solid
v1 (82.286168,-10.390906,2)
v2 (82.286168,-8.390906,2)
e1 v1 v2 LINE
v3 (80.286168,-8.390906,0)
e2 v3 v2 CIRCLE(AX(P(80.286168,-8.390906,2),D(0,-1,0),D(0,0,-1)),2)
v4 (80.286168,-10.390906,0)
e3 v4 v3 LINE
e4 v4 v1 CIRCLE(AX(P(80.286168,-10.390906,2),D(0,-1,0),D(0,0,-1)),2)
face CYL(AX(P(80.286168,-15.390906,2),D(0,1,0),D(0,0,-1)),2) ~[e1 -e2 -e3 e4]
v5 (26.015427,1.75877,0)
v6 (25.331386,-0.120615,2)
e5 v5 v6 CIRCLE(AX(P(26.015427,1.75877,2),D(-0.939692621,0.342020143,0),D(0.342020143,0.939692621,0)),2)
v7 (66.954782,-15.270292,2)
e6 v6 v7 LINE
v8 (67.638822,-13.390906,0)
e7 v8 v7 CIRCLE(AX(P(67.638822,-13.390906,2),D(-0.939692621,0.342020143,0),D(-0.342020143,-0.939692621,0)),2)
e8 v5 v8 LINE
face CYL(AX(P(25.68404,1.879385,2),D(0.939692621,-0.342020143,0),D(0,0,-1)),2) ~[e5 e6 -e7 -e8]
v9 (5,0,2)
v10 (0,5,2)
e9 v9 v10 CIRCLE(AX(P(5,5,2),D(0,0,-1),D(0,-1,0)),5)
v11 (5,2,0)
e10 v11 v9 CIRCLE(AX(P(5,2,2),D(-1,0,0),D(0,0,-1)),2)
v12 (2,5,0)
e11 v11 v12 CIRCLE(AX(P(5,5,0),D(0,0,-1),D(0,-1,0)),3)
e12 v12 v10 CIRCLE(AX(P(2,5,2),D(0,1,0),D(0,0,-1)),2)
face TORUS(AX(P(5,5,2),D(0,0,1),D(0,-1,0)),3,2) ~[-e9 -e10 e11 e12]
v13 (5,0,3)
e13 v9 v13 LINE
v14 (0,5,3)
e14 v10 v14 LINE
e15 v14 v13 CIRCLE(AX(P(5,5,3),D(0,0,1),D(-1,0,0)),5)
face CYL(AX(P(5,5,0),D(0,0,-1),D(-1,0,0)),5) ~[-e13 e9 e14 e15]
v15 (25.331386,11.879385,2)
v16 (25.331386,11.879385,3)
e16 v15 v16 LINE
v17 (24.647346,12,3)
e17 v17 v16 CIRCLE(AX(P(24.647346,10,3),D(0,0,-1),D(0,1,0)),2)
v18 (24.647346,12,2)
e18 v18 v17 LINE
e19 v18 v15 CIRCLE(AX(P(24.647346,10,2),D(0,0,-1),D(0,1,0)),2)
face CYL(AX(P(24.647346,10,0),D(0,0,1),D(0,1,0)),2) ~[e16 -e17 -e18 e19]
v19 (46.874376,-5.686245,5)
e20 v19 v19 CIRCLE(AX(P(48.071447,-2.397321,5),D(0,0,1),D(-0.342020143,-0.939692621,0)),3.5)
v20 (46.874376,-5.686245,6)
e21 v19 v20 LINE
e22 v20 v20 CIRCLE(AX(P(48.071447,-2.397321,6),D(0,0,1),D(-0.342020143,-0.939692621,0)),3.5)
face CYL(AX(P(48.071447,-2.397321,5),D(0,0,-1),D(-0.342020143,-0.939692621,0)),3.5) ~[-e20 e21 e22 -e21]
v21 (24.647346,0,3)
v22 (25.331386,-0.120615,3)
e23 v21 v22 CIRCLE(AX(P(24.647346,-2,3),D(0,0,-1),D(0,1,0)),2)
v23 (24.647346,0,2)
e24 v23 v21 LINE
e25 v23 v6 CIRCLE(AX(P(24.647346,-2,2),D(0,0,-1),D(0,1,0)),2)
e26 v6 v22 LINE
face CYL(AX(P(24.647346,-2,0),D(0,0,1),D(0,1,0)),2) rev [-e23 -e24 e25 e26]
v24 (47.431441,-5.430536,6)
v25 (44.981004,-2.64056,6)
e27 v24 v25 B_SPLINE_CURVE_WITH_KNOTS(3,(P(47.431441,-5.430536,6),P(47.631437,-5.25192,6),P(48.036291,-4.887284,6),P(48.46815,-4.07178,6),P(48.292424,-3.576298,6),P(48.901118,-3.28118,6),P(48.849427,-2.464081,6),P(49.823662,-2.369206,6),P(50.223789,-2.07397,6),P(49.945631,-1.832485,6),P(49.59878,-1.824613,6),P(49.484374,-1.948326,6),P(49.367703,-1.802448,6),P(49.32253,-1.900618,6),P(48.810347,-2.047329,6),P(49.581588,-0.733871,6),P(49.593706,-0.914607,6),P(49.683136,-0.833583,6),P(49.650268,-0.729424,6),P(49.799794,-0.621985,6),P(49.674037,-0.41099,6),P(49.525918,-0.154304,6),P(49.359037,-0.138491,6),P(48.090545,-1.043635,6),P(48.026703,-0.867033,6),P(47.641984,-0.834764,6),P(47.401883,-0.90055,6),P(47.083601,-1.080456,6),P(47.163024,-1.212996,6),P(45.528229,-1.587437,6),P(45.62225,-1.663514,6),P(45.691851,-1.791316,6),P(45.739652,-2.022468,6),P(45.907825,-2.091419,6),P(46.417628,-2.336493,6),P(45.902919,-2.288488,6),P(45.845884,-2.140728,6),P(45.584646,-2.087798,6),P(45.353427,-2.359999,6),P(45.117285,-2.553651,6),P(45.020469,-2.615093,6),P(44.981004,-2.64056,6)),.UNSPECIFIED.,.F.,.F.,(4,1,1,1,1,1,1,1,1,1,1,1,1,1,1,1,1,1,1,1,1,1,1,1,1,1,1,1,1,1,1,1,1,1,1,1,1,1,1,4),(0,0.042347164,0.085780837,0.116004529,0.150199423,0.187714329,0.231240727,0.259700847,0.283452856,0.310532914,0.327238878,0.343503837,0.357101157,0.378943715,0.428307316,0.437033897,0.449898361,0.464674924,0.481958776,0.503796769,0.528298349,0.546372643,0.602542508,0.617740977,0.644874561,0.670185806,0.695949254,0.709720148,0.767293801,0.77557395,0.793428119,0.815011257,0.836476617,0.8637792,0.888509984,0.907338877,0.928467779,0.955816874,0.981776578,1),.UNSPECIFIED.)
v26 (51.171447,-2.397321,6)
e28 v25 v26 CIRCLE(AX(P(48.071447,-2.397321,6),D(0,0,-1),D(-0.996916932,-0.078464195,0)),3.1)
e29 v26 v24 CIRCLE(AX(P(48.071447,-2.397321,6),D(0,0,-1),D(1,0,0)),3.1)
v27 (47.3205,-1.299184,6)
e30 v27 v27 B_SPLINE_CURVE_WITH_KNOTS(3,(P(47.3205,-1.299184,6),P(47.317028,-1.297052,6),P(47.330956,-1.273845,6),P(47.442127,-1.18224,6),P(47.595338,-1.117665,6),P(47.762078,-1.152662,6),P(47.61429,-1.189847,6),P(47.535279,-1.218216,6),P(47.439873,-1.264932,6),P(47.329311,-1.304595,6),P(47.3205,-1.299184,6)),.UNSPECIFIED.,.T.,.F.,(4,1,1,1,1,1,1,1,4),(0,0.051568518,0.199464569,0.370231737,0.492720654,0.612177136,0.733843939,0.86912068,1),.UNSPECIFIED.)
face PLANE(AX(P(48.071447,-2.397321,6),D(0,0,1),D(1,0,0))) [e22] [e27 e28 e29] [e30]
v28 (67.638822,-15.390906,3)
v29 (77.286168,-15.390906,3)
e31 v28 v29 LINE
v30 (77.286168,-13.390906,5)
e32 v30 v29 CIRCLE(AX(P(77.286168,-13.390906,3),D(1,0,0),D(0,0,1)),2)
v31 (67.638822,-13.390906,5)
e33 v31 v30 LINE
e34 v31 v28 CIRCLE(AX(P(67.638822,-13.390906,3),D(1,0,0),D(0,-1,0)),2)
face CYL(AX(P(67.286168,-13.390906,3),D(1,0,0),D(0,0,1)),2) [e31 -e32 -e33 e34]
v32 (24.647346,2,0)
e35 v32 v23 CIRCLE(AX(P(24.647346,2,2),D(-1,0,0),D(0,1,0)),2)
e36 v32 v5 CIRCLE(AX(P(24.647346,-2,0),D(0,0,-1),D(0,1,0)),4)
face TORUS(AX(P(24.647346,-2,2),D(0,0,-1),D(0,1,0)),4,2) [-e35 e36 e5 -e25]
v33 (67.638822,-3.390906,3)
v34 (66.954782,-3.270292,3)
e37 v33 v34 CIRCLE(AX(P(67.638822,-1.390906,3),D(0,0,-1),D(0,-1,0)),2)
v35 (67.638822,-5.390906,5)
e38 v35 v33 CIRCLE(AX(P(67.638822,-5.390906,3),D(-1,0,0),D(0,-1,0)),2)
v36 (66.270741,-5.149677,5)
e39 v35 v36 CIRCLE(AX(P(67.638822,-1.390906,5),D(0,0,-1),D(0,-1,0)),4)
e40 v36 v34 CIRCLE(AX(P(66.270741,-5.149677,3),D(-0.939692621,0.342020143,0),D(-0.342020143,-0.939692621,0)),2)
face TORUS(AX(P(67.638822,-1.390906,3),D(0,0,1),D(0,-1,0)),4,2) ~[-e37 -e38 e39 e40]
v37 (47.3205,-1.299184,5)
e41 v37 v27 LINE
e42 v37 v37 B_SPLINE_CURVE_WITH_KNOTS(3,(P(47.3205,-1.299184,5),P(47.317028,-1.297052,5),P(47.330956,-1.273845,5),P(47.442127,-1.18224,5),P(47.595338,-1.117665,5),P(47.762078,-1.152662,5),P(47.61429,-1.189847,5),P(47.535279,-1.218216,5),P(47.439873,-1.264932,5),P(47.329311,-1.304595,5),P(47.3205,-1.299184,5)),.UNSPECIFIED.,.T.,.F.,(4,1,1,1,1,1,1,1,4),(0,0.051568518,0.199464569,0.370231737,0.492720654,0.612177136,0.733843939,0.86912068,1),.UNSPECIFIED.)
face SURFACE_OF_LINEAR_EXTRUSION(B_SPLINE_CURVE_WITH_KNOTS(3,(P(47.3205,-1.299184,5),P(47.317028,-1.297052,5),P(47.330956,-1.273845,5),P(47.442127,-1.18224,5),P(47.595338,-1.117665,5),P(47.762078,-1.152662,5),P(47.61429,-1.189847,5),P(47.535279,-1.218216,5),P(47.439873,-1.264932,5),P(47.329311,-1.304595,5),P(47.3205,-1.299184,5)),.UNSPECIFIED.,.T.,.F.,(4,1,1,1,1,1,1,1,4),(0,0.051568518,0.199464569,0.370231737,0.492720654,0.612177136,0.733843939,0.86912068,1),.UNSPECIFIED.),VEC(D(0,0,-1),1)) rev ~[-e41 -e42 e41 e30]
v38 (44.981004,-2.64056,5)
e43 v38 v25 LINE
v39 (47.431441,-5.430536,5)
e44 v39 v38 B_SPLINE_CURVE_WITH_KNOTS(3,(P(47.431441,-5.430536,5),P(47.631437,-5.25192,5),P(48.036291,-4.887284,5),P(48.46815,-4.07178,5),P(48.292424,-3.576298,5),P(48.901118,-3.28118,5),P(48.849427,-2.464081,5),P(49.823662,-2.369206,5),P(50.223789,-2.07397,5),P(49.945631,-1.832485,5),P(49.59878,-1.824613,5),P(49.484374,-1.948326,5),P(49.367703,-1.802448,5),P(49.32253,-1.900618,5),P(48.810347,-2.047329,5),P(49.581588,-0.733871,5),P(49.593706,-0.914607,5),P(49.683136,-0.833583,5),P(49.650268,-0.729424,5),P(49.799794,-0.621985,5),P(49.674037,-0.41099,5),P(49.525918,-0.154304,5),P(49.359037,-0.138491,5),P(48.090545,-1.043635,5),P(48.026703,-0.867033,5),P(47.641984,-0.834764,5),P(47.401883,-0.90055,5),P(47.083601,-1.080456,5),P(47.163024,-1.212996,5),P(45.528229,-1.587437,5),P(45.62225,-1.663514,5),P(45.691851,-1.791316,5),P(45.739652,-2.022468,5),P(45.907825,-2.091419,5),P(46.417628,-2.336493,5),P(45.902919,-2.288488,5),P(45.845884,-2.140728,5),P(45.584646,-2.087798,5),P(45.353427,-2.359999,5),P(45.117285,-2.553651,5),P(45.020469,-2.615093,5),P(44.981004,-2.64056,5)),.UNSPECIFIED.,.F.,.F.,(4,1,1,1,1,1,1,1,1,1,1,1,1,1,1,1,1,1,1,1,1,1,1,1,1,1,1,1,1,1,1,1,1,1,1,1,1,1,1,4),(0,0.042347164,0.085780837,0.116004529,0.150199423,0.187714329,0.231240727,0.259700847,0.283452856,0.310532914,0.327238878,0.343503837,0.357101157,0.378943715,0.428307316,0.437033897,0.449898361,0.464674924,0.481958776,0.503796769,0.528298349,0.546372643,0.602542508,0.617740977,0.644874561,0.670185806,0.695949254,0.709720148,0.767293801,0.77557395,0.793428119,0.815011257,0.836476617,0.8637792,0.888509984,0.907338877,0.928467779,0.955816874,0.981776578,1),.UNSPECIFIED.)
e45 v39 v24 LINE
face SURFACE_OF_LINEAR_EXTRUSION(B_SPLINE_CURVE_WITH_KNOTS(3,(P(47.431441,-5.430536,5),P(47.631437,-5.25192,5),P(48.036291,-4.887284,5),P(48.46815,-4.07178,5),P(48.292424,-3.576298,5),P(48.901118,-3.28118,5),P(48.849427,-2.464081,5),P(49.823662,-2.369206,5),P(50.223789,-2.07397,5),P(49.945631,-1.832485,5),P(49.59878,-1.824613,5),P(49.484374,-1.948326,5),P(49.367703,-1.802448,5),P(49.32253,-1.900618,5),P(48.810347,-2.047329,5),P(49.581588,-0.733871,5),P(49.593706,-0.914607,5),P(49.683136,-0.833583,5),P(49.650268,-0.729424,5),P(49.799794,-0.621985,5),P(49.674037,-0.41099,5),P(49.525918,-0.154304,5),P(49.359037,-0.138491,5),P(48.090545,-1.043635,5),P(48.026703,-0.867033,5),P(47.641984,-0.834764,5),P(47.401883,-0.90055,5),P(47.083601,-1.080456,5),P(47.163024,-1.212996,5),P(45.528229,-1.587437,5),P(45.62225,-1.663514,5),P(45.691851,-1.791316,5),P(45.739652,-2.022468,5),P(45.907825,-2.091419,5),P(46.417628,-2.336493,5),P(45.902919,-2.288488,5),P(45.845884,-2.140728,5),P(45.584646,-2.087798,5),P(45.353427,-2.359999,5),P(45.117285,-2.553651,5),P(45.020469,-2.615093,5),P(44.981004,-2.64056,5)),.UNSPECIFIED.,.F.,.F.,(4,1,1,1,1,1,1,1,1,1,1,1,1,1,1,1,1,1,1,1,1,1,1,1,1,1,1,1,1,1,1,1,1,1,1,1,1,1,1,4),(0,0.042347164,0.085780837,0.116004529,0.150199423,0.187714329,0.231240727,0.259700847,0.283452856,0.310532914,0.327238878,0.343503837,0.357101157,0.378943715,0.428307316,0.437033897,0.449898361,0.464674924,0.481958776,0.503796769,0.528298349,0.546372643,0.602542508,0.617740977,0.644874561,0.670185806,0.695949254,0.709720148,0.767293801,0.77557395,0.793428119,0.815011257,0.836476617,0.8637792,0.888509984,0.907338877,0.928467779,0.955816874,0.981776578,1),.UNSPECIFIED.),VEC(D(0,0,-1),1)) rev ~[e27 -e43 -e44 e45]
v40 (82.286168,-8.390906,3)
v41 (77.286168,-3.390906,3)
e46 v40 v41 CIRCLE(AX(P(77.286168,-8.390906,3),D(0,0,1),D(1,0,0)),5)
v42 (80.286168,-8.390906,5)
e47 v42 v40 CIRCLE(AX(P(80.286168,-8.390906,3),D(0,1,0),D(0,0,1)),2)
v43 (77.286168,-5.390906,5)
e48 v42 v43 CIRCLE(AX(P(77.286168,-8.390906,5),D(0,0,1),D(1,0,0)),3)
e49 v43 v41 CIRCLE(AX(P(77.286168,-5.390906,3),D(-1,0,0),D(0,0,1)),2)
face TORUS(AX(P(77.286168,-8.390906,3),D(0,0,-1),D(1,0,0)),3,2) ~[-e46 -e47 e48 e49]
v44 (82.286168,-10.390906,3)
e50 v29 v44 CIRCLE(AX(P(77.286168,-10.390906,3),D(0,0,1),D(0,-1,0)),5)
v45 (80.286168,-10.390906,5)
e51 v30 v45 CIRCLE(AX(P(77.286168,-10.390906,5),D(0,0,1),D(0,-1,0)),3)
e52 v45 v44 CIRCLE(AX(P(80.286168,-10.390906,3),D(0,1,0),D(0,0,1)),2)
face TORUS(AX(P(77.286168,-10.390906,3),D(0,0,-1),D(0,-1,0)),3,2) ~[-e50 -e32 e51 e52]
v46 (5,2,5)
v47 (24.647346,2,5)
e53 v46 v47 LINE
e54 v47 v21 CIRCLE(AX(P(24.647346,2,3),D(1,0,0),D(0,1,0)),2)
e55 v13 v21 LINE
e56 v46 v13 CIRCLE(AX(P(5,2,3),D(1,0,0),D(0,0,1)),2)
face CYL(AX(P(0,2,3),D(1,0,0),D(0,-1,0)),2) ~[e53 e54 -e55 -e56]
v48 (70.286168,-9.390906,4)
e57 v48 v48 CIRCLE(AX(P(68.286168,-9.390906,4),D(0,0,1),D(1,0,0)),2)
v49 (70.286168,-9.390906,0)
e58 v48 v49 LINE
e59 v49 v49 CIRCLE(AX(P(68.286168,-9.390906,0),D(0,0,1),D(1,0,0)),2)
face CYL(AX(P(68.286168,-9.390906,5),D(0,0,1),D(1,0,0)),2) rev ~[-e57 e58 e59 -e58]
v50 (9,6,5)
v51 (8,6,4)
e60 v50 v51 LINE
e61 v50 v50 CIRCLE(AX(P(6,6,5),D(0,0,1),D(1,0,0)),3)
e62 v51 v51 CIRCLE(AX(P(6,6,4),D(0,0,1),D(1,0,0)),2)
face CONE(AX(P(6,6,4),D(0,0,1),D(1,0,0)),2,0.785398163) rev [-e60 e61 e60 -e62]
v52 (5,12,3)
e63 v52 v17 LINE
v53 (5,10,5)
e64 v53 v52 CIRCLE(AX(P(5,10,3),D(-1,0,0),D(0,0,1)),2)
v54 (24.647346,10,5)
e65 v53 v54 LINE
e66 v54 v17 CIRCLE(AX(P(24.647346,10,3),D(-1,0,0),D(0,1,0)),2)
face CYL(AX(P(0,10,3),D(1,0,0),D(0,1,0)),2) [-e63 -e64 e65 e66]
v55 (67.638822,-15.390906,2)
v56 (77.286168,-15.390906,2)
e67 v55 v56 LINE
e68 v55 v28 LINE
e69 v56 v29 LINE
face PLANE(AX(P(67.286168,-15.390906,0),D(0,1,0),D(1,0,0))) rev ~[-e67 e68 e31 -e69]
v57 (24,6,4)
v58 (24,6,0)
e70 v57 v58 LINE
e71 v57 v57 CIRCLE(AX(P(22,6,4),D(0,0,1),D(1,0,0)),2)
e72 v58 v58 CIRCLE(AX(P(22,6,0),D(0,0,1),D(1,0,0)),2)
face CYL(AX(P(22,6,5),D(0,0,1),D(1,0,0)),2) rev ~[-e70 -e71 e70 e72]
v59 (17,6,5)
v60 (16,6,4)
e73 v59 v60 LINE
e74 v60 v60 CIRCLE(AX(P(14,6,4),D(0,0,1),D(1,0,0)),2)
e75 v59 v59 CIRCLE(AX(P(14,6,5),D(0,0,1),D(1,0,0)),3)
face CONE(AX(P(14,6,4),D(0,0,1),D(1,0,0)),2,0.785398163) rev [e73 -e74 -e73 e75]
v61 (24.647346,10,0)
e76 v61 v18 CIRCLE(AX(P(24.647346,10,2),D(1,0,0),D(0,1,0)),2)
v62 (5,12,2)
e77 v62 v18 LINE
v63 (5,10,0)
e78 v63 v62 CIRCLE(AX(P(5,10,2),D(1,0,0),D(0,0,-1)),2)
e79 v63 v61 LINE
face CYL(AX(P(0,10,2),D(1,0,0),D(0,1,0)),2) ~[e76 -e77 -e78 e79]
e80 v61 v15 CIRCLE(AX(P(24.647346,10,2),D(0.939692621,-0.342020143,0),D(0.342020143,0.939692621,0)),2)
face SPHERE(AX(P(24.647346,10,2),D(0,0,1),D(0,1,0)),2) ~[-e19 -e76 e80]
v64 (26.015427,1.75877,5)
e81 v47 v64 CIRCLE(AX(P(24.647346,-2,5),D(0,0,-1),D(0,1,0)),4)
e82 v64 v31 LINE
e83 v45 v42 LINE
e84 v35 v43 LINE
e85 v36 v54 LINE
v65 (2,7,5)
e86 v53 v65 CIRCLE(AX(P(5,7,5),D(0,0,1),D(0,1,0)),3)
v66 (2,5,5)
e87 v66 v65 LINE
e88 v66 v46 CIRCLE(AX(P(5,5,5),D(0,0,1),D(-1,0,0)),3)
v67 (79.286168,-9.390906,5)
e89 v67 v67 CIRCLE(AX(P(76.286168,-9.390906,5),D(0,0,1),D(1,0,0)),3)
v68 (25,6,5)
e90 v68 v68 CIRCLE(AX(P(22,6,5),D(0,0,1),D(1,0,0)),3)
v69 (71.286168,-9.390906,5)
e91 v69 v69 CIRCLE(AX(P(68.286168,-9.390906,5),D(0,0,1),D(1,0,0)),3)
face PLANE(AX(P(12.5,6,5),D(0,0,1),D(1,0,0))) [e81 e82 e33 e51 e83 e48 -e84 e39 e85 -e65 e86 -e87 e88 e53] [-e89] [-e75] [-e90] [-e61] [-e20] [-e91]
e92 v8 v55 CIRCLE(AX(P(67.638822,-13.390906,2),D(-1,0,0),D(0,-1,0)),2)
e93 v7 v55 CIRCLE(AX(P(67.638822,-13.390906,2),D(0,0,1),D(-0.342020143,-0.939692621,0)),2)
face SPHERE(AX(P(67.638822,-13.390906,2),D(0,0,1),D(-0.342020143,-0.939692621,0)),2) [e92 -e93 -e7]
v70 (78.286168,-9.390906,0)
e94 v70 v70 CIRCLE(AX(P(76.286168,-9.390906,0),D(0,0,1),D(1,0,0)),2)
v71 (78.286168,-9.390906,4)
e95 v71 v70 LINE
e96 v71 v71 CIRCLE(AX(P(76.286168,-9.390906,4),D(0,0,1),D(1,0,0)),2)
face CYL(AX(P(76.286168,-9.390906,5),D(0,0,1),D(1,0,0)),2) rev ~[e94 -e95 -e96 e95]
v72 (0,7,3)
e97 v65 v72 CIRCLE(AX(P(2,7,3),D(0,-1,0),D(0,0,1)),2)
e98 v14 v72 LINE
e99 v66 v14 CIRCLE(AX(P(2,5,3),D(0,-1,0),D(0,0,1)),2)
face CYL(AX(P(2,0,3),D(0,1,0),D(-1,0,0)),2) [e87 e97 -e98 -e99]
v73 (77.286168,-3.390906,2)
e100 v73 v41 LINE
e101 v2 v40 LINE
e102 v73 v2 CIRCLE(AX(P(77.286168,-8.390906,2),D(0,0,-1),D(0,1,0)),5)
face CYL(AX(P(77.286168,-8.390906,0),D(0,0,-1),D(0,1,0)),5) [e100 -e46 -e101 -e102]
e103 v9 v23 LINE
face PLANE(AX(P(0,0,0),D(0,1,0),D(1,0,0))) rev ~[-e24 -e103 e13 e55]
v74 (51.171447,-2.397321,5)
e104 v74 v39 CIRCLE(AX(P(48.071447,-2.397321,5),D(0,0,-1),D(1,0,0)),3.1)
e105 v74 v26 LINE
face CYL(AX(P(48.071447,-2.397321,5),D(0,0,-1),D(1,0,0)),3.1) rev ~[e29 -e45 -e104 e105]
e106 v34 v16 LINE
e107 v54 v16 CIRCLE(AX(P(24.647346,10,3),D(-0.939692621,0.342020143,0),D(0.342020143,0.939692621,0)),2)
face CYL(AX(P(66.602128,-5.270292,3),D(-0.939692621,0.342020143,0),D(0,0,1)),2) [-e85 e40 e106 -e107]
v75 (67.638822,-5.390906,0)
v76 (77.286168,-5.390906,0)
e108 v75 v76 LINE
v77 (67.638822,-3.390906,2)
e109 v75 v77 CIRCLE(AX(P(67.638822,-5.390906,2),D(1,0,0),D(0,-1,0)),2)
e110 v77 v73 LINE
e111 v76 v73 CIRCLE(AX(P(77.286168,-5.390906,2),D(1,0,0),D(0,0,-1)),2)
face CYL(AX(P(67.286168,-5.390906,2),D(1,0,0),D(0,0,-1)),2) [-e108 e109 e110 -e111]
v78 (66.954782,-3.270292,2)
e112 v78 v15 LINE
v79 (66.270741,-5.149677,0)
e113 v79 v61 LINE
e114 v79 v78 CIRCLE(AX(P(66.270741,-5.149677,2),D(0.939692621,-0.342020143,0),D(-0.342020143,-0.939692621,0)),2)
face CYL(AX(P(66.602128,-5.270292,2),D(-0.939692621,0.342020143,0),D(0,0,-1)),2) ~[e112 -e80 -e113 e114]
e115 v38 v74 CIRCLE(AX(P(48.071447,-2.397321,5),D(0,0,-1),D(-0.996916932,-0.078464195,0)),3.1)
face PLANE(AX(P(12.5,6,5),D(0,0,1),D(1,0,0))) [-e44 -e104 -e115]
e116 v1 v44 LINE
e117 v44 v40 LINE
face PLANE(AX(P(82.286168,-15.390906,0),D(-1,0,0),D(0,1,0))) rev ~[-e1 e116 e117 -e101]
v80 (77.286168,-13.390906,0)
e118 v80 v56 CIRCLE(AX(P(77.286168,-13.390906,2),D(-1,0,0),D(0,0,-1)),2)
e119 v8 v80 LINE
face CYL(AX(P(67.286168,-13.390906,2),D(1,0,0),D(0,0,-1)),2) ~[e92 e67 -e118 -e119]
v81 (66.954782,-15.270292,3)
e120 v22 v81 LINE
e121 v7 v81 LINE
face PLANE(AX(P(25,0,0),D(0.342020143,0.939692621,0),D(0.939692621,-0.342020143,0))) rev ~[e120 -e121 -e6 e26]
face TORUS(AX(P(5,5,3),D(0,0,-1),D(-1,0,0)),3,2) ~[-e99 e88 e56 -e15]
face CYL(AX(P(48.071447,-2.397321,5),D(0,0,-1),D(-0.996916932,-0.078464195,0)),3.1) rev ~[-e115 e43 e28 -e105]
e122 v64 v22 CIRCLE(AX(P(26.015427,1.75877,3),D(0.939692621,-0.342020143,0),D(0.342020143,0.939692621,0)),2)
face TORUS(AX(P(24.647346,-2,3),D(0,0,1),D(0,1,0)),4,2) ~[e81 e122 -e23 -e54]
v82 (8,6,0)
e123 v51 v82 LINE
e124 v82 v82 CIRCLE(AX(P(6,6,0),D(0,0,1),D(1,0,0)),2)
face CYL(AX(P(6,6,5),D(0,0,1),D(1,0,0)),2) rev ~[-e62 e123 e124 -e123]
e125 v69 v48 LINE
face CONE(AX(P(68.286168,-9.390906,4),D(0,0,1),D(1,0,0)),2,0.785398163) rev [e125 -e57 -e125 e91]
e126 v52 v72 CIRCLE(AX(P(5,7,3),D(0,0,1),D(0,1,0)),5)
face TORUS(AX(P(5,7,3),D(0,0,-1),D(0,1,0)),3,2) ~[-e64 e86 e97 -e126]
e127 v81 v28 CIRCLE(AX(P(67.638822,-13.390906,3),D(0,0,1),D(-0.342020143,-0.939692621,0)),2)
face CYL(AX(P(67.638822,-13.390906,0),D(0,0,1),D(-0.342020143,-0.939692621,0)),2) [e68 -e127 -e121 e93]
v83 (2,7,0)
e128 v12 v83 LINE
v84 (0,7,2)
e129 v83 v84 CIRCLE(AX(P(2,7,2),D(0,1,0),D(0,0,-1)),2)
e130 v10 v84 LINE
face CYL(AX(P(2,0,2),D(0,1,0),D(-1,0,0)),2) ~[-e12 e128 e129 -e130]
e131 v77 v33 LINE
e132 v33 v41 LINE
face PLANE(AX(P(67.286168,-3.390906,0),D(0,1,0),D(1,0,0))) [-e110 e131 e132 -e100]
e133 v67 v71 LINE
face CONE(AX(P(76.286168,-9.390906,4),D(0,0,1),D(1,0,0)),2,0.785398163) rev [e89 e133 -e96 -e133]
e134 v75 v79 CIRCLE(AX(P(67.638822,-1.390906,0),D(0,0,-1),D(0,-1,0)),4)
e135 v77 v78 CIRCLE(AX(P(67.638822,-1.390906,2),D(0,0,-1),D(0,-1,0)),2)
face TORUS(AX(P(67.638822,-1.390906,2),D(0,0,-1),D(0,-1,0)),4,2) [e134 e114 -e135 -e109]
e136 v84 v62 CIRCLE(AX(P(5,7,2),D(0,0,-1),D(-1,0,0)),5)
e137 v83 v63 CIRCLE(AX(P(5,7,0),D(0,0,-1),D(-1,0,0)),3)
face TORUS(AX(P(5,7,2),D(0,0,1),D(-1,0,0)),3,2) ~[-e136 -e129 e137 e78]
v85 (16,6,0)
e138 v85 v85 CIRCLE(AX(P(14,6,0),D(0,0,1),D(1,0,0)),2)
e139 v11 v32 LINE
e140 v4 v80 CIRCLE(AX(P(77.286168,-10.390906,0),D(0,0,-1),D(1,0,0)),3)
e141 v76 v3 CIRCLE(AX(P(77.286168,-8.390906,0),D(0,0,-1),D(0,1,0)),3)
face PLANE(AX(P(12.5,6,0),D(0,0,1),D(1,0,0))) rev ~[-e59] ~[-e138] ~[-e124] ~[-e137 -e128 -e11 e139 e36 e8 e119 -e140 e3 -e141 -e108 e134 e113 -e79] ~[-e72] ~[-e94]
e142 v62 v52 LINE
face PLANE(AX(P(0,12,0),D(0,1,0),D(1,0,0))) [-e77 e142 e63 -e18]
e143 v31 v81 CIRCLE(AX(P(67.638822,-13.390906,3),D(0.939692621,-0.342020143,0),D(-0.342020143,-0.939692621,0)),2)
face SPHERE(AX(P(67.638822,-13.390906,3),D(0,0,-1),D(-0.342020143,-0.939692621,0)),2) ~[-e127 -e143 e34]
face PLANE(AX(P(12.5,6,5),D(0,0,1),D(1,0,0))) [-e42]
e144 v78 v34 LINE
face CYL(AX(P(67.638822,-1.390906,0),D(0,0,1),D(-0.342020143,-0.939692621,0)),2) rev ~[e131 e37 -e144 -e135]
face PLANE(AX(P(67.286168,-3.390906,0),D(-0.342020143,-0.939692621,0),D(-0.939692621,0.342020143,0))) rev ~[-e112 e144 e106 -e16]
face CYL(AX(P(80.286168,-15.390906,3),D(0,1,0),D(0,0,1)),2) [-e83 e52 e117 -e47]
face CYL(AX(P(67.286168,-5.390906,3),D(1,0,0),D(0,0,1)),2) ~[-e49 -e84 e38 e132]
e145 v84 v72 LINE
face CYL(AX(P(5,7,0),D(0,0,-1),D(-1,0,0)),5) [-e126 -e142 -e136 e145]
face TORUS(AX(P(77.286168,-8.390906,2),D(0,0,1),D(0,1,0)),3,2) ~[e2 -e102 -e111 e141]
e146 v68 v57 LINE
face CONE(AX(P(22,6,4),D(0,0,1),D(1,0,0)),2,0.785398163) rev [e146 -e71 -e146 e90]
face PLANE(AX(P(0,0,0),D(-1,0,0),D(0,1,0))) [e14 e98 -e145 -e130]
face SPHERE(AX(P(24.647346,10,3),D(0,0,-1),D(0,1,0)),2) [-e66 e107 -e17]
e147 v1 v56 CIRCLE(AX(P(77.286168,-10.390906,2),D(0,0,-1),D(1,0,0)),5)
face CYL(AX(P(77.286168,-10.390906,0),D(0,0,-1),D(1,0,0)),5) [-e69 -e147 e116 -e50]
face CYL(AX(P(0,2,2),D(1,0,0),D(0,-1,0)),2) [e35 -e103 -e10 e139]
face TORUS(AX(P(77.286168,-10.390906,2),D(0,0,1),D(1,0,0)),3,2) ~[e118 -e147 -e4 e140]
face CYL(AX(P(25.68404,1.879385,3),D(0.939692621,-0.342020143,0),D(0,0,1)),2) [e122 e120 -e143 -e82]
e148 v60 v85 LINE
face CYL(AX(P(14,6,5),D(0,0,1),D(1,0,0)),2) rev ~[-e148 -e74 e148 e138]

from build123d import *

# Parameters (mm, degrees)
F0_W         = 25
F0_H         = 12
F0_W_2       = 15
F1_DEPTH     = 5
F2_R         = 2
F3_DEPTH     = 5.001
F4_R         = 2
F5_T1_DEPTH  = 5
F5_T4_ANGLE  = 90
F5_T6_ANGLE  = 90
F5_T8_ANGLE  = 90
F5_T10_ANGLE = 90
F5_T12_ANGLE = 90
F5_T14_ANGLE = 90
F5_T16_ANGLE = 90
F5_T18_ANGLE = 90
F6_SIZE      = 1
F8_DEPTH     = 1


# Not quite as in the source:
# - a fillet or chamfer that OpenCascade refuses, or shapes differently, is made with other operations: its cross-section is extruded or revolved along the edge and cut away or added


with BuildPart() as f1:
    # F0 (on Top) → F1 (new body)
    with BuildSketch(Plane.XY):
        with Locations((12.5, 6)):
            Rectangle(F0_W, F0_H)
        with Locations((74.7861679354, -9.3909064497)):
            Rectangle(F0_W_2, F0_H)
        Polygon((25, 12), (25, 0), (67.2861679354, -15.3909064497), (67.2861679354, -3.3909064497), align=None)
    extrude(amount=F1_DEPTH)

    # F2 (on face) → F3 (cut, through all)
    with BuildSketch(Plane.XY.offset(5)):
        with Locations((6, 6)):
            Circle(F2_R)
        with Locations((14, 6)):
            Circle(F2_R)
        with Locations((22, 6)):
            Circle(F2_R)
        with Locations((68.2861679354, -9.3909064497)):
            Circle(F2_R)
        with Locations((76.2861679354, -9.3909064497)):
            Circle(F2_R)
    extrude(amount=-F3_DEPTH, mode=Mode.SUBTRACT)

    # F4
    f4_edges = [f1.edges().sort_by_distance(p)[0] for p in [
        (12.5, 12, 5),
        (12.5, 12, 0),
        (0, 6, 5),
        (0, 6, 0),
        (12.5, 0, 5),
        (12.5, 0, 0),
        (46.143084, -7.695453, 5),
        (74.786168, -15.390906, 5),
        (46.143084, -7.695453, 0),
        (74.786168, -15.390906, 0),
        (82.286168, -9.390906, 5),
        (82.286168, -9.390906, 0),
        (74.786168, -3.390906, 0),
        (74.786168, -3.390906, 5),
        (46.143084, 4.304547, 5),
        (46.143084, 4.304547, 0),
        (25, 12, 2.5),
        (67.286168, -3.390906, 2.5),
        (67.286168, -15.390906, 2.5),
        (25, 0, 2.5),
    ]]
    fillet(f4_edges, radius=F4_R)

    # F5: fillet of radius 5 on 6 edges, made by hand

    # F5_s2 → F5_t1 (cut)
    with BuildSketch(Plane.XY):
        with BuildLine():
            ThreePointArc((0, 5), (1.4644660941, 1.4644660941), (5, 0))
            Line((5, 0), (0, 0))
            Line((0, 0), (0, 5))
        make_face()
        with BuildLine():
            ThreePointArc((82.2861679354, -10.3909064497), (80.8217018413, -13.9264403556), (77.2861679354, -15.3909064497))
            Line((77.2861679354, -15.3909064497), (82.2861679354, -15.3909064497))
            Line((82.2861679354, -15.3909064497), (82.2861679354, -10.3909064497))
        make_face()
        with BuildLine():
            ThreePointArc((77.2861679354, -3.3909064497), (80.8217018413, -4.8553725437), (82.2861679354, -8.3909064497))
            Line((82.2861679354, -8.3909064497), (82.2861679354, -3.3909064497))
            Line((82.2861679354, -3.3909064497), (77.2861679354, -3.3909064497))
        make_face()
        with BuildLine():
            ThreePointArc((0, 7), (1.4644660941, 10.5355339059), (5, 12))
            Line((5, 12), (0, 12))
            Line((0, 12), (0, 7))
        make_face()
    extrude(amount=F5_T1_DEPTH, mode=Mode.SUBTRACT)

    # F5_s3 → F5_t4 (revolve, cut)
    with BuildSketch(Plane.XZ.offset(-5)):
        with BuildLine():
            ThreePointArc((2, 5), (0.5857864376, 4.4142135624), (0, 3))
            Line((0, 3), (0, 5))
            Line((0, 5), (2, 5))
        make_face()
    revolve(axis=Axis((5, 5, 5), (0, 0, 1)), revolution_arc=F5_T4_ANGLE, mode=Mode.SUBTRACT)

    # F5_s5 → F5_t6 (revolve, cut)
    with BuildSketch(Plane.YZ.offset(5)):
        with BuildLine():
            ThreePointArc((2, 0), (0.5857864376, 0.5857864376), (0, 2))
            Line((0, 2), (0, 0))
            Line((0, 0), (2, 0))
        make_face()
    revolve(axis=Axis((5, 5, 0), (0, 0, -1)), revolution_arc=F5_T6_ANGLE, mode=Mode.SUBTRACT)

    # F5_s7 → F5_t8 (revolve, cut)
    with BuildSketch(Plane.YZ.offset(5)):
        with BuildLine():
            ThreePointArc((10, 5), (11.4142135624, 4.4142135624), (12, 3))
            Line((12, 3), (12, 5))
            Line((12, 5), (10, 5))
        make_face()
    revolve(axis=Axis((5, 7, 5), (0, 0, 1)), revolution_arc=F5_T8_ANGLE, mode=Mode.SUBTRACT)

    # F5_s9 → F5_t10 (revolve, cut)
    with BuildSketch(Plane.XZ.offset(8.3909064497)):
        with BuildLine():
            ThreePointArc((80.2861679354, 5), (81.7003814977, 4.4142135624), (82.2861679354, 3))
            Line((82.2861679354, 3), (82.2861679354, 5))
            Line((82.2861679354, 5), (80.2861679354, 5))
        make_face()
    revolve(axis=Axis((77.2861679354, -8.3909064497, 5), (0, 0, 1)), revolution_arc=F5_T10_ANGLE, mode=Mode.SUBTRACT)

    # F5_s11 → F5_t12 (revolve, cut)
    with BuildSketch(Plane.YZ.offset(77.2861679354)):
        with BuildLine():
            ThreePointArc((-13.3909064497, 5), (-14.805120012, 4.4142135624), (-15.3909064497, 3))
            Line((-15.3909064497, 3), (-15.3909064497, 5))
            Line((-15.3909064497, 5), (-13.3909064497, 5))
        make_face()
    revolve(axis=Axis((77.2861679354, -10.3909064497, 5), (0, 0, 1)), revolution_arc=F5_T12_ANGLE, mode=Mode.SUBTRACT)

    # F5_s13 → F5_t14 (revolve, cut)
    with BuildSketch(Plane.XZ.offset(10.3909064497)):
        with BuildLine():
            ThreePointArc((80.2861679354, 0), (81.7003814977, 0.5857864376), (82.2861679354, 2))
            Line((82.2861679354, 2), (82.2861679354, 0))
            Line((82.2861679354, 0), (80.2861679354, 0))
        make_face()
    revolve(axis=Axis((77.2861679354, -10.3909064497, 0), (0, 0, -1)), revolution_arc=F5_T14_ANGLE, mode=Mode.SUBTRACT)

    # F5_s15 → F5_t16 (revolve, cut)
    with BuildSketch(Plane.YZ.offset(77.2861679354)):
        with BuildLine():
            ThreePointArc((-5.3909064497, 0), (-3.9766928873, 0.5857864376), (-3.3909064497, 2))
            Line((-3.3909064497, 2), (-3.3909064497, 0))
            Line((-3.3909064497, 0), (-5.3909064497, 0))
        make_face()
    revolve(axis=Axis((77.2861679354, -8.3909064497, 0), (0, 0, -1)), revolution_arc=F5_T16_ANGLE, mode=Mode.SUBTRACT)

    # F5_s17 → F5_t18 (revolve, cut)
    with BuildSketch(Plane.XZ.offset(-7)):
        with BuildLine():
            ThreePointArc((2, 0), (0.5857864376, 0.5857864376), (0, 2))
            Line((0, 2), (0, 0))
            Line((0, 0), (2, 0))
        make_face()
    revolve(axis=Axis((5, 7, 0), (0, 0, -1)), revolution_arc=F5_T18_ANGLE, mode=Mode.SUBTRACT)

    # F6
    f6_edges = [f1.edges().sort_by_distance(p)[0] for p in [
        (79.407488, -6.269586, 5),
        (80.286168, -9.390906, 5),
        (79.407488, -12.512227, 5),
        (72.462495, -13.390906, 5),
        (46.827124, -5.816068, 5),
        (25.341939, 1.939231, 5),
        (14.823673, 2, 5),
        (2.87868, 2.87868, 5),
        (2, 6, 5),
        (2.87868, 9.12132, 5),
        (14.823673, 10, 5),
        (45.459044, 2.425162, 5),
        (66.944229, -5.330137, 5),
        (72.462495, -5.390906, 5),
        (66.286168, -9.390906, 5),
        (74.286168, -9.390906, 5),
        (4, 6, 5),
        (12, 6, 5),
        (20, 6, 5),
    ]]
    chamfer(f6_edges, length=F6_SIZE)

    # F7 (on face) → F8 (join)
    with BuildSketch(Plane.XY.offset(5)):
        with BuildLine():
            ThreePointArc((51.5714465489, -2.3973205765), (46.0639290216, 0.4697115785), (46.8743760472, -5.6862447492))
            ThreePointArc((46.8743760472, -5.6862447492), (50.0789640761, -5.2643527315), (51.5714465489, -2.3973205765))
        make_face()
        with BuildLine():
            ThreePointArc((47.4314412964, -5.4305355832), (47.2191921032, -5.377867902), (47.0111841046, -5.3103677009))
            ThreePointArc((47.0111841046, -5.3103677009), (45.6038451401, -4.2737382506), (44.9810040585, -2.6405595815))
            ThreePointArc((44.9810040585, -2.6405595815), (47.9497331976, 0.7002891246), (51.1714465489, -2.3973205765))
            ThreePointArc((51.1714465489, -2.3973205765), (50.0241349159, -4.8050182613), (47.4314412964, -5.4305355832))
        make_face(mode=Mode.SUBTRACT)
        with BuildLine():
            ThreePointArc((44.9810040585, -2.6405595815), (45.6038451401, -4.2737382506), (47.0111841046, -5.3103677009))
            ThreePointArc((47.0111841046, -5.3103677009), (47.2191921032, -5.377867902), (47.4314412964, -5.4305355832))
            add(Edge.make_bspline(
                [(47.4314412964, -5.4305355832), (47.6314367313, -5.2519198305), (48.0362906471, -4.8872836094), (48.468150212, -4.0717796771), (48.2924237267, -3.5762982707), (48.9011177808, -3.2811798776), (48.8494271325, -2.4640809426), (49.8236616127, -2.3692057118), (50.2237885599, -2.0739698413), (49.9456305001, -1.8324852755), (49.5987799493, -1.8246132857), (49.4843735029, -1.9483257192), (49.3677026913, -1.8024479313), (49.3225296886, -1.9006184423), (48.8103474072, -2.0473285161), (49.581588425, -0.733870789), (49.5937064562, -0.9146074645), (49.6831355962, -0.8335828451), (49.6502679031, -0.7294239361), (49.7997941938, -0.6219848275), (49.6740369369, -0.4109902764), (49.5259184159, -0.1543038146), (49.3590367293, -0.1384905431), (48.0905454387, -1.0436348081), (48.026703291, -0.8670334883), (47.6419840925, -0.8347640081), (47.4018831656, -0.9005504349), (47.0836008469, -1.080456227), (47.1630236319, -1.2129956159), (45.5282289402, -1.5874370165), (45.6222497961, -1.6635138084), (45.6918513072, -1.7913162808), (45.739651642, -2.0224683846), (45.9078245747, -2.0914190074), (46.417628081, -2.3364929106), (45.9029191747, -2.2884877025), (45.8458841897, -2.1407284184), (45.5846462866, -2.0877978243), (45.3534270615, -2.3599985886), (45.1172854743, -2.5536514723), (45.0204691016, -2.6150925379), (44.9810040585, -2.6405595815)],
                knots=[0, 0, 0, 0, 0.042347164, 0.0857808372, 0.1160045286, 0.1501994234, 0.1877143295, 0.231240727, 0.2597008473, 0.2834528562, 0.310532914, 0.3272388783, 0.3435038371, 0.3571011567, 0.3789437154, 0.4283073163, 0.4370338972, 0.4498983608, 0.4646749244, 0.4819587762, 0.503796769, 0.5282983487, 0.5463726429, 0.6025425082, 0.6177409772, 0.6448745615, 0.6701858059, 0.6959492542, 0.7097201481, 0.7672938014, 0.7755739502, 0.7934281186, 0.8150112571, 0.836476617, 0.8637791999, 0.8885099845, 0.9073388771, 0.9284677792, 0.9558168743, 0.9817765779, 1, 1, 1, 1], degree=3))
        make_face()
        with BuildLine():
            add(Edge.make_bspline(
                [(47.3205000162, -1.299184165), (47.3170283076, -1.2970522608), (47.3309562262, -1.2738451866), (47.4421272866, -1.1822398815), (47.5953384947, -1.1176653509), (47.7620775243, -1.1526621903), (47.6142904797, -1.1898473793), (47.5352787361, -1.2182161742), (47.4398727725, -1.2649320685), (47.3293111063, -1.3045948726), (47.3205000162, -1.299184165)],
                knots=[0, 0, 0, 0, 0.0515685181, 0.1994645691, 0.3702317371, 0.4927206541, 0.6121771362, 0.7338439394, 0.86912068, 1, 1, 1, 1], degree=3))
        make_face(mode=Mode.SUBTRACT)
    extrude(amount=F8_DEPTH)


solid = f1.part
